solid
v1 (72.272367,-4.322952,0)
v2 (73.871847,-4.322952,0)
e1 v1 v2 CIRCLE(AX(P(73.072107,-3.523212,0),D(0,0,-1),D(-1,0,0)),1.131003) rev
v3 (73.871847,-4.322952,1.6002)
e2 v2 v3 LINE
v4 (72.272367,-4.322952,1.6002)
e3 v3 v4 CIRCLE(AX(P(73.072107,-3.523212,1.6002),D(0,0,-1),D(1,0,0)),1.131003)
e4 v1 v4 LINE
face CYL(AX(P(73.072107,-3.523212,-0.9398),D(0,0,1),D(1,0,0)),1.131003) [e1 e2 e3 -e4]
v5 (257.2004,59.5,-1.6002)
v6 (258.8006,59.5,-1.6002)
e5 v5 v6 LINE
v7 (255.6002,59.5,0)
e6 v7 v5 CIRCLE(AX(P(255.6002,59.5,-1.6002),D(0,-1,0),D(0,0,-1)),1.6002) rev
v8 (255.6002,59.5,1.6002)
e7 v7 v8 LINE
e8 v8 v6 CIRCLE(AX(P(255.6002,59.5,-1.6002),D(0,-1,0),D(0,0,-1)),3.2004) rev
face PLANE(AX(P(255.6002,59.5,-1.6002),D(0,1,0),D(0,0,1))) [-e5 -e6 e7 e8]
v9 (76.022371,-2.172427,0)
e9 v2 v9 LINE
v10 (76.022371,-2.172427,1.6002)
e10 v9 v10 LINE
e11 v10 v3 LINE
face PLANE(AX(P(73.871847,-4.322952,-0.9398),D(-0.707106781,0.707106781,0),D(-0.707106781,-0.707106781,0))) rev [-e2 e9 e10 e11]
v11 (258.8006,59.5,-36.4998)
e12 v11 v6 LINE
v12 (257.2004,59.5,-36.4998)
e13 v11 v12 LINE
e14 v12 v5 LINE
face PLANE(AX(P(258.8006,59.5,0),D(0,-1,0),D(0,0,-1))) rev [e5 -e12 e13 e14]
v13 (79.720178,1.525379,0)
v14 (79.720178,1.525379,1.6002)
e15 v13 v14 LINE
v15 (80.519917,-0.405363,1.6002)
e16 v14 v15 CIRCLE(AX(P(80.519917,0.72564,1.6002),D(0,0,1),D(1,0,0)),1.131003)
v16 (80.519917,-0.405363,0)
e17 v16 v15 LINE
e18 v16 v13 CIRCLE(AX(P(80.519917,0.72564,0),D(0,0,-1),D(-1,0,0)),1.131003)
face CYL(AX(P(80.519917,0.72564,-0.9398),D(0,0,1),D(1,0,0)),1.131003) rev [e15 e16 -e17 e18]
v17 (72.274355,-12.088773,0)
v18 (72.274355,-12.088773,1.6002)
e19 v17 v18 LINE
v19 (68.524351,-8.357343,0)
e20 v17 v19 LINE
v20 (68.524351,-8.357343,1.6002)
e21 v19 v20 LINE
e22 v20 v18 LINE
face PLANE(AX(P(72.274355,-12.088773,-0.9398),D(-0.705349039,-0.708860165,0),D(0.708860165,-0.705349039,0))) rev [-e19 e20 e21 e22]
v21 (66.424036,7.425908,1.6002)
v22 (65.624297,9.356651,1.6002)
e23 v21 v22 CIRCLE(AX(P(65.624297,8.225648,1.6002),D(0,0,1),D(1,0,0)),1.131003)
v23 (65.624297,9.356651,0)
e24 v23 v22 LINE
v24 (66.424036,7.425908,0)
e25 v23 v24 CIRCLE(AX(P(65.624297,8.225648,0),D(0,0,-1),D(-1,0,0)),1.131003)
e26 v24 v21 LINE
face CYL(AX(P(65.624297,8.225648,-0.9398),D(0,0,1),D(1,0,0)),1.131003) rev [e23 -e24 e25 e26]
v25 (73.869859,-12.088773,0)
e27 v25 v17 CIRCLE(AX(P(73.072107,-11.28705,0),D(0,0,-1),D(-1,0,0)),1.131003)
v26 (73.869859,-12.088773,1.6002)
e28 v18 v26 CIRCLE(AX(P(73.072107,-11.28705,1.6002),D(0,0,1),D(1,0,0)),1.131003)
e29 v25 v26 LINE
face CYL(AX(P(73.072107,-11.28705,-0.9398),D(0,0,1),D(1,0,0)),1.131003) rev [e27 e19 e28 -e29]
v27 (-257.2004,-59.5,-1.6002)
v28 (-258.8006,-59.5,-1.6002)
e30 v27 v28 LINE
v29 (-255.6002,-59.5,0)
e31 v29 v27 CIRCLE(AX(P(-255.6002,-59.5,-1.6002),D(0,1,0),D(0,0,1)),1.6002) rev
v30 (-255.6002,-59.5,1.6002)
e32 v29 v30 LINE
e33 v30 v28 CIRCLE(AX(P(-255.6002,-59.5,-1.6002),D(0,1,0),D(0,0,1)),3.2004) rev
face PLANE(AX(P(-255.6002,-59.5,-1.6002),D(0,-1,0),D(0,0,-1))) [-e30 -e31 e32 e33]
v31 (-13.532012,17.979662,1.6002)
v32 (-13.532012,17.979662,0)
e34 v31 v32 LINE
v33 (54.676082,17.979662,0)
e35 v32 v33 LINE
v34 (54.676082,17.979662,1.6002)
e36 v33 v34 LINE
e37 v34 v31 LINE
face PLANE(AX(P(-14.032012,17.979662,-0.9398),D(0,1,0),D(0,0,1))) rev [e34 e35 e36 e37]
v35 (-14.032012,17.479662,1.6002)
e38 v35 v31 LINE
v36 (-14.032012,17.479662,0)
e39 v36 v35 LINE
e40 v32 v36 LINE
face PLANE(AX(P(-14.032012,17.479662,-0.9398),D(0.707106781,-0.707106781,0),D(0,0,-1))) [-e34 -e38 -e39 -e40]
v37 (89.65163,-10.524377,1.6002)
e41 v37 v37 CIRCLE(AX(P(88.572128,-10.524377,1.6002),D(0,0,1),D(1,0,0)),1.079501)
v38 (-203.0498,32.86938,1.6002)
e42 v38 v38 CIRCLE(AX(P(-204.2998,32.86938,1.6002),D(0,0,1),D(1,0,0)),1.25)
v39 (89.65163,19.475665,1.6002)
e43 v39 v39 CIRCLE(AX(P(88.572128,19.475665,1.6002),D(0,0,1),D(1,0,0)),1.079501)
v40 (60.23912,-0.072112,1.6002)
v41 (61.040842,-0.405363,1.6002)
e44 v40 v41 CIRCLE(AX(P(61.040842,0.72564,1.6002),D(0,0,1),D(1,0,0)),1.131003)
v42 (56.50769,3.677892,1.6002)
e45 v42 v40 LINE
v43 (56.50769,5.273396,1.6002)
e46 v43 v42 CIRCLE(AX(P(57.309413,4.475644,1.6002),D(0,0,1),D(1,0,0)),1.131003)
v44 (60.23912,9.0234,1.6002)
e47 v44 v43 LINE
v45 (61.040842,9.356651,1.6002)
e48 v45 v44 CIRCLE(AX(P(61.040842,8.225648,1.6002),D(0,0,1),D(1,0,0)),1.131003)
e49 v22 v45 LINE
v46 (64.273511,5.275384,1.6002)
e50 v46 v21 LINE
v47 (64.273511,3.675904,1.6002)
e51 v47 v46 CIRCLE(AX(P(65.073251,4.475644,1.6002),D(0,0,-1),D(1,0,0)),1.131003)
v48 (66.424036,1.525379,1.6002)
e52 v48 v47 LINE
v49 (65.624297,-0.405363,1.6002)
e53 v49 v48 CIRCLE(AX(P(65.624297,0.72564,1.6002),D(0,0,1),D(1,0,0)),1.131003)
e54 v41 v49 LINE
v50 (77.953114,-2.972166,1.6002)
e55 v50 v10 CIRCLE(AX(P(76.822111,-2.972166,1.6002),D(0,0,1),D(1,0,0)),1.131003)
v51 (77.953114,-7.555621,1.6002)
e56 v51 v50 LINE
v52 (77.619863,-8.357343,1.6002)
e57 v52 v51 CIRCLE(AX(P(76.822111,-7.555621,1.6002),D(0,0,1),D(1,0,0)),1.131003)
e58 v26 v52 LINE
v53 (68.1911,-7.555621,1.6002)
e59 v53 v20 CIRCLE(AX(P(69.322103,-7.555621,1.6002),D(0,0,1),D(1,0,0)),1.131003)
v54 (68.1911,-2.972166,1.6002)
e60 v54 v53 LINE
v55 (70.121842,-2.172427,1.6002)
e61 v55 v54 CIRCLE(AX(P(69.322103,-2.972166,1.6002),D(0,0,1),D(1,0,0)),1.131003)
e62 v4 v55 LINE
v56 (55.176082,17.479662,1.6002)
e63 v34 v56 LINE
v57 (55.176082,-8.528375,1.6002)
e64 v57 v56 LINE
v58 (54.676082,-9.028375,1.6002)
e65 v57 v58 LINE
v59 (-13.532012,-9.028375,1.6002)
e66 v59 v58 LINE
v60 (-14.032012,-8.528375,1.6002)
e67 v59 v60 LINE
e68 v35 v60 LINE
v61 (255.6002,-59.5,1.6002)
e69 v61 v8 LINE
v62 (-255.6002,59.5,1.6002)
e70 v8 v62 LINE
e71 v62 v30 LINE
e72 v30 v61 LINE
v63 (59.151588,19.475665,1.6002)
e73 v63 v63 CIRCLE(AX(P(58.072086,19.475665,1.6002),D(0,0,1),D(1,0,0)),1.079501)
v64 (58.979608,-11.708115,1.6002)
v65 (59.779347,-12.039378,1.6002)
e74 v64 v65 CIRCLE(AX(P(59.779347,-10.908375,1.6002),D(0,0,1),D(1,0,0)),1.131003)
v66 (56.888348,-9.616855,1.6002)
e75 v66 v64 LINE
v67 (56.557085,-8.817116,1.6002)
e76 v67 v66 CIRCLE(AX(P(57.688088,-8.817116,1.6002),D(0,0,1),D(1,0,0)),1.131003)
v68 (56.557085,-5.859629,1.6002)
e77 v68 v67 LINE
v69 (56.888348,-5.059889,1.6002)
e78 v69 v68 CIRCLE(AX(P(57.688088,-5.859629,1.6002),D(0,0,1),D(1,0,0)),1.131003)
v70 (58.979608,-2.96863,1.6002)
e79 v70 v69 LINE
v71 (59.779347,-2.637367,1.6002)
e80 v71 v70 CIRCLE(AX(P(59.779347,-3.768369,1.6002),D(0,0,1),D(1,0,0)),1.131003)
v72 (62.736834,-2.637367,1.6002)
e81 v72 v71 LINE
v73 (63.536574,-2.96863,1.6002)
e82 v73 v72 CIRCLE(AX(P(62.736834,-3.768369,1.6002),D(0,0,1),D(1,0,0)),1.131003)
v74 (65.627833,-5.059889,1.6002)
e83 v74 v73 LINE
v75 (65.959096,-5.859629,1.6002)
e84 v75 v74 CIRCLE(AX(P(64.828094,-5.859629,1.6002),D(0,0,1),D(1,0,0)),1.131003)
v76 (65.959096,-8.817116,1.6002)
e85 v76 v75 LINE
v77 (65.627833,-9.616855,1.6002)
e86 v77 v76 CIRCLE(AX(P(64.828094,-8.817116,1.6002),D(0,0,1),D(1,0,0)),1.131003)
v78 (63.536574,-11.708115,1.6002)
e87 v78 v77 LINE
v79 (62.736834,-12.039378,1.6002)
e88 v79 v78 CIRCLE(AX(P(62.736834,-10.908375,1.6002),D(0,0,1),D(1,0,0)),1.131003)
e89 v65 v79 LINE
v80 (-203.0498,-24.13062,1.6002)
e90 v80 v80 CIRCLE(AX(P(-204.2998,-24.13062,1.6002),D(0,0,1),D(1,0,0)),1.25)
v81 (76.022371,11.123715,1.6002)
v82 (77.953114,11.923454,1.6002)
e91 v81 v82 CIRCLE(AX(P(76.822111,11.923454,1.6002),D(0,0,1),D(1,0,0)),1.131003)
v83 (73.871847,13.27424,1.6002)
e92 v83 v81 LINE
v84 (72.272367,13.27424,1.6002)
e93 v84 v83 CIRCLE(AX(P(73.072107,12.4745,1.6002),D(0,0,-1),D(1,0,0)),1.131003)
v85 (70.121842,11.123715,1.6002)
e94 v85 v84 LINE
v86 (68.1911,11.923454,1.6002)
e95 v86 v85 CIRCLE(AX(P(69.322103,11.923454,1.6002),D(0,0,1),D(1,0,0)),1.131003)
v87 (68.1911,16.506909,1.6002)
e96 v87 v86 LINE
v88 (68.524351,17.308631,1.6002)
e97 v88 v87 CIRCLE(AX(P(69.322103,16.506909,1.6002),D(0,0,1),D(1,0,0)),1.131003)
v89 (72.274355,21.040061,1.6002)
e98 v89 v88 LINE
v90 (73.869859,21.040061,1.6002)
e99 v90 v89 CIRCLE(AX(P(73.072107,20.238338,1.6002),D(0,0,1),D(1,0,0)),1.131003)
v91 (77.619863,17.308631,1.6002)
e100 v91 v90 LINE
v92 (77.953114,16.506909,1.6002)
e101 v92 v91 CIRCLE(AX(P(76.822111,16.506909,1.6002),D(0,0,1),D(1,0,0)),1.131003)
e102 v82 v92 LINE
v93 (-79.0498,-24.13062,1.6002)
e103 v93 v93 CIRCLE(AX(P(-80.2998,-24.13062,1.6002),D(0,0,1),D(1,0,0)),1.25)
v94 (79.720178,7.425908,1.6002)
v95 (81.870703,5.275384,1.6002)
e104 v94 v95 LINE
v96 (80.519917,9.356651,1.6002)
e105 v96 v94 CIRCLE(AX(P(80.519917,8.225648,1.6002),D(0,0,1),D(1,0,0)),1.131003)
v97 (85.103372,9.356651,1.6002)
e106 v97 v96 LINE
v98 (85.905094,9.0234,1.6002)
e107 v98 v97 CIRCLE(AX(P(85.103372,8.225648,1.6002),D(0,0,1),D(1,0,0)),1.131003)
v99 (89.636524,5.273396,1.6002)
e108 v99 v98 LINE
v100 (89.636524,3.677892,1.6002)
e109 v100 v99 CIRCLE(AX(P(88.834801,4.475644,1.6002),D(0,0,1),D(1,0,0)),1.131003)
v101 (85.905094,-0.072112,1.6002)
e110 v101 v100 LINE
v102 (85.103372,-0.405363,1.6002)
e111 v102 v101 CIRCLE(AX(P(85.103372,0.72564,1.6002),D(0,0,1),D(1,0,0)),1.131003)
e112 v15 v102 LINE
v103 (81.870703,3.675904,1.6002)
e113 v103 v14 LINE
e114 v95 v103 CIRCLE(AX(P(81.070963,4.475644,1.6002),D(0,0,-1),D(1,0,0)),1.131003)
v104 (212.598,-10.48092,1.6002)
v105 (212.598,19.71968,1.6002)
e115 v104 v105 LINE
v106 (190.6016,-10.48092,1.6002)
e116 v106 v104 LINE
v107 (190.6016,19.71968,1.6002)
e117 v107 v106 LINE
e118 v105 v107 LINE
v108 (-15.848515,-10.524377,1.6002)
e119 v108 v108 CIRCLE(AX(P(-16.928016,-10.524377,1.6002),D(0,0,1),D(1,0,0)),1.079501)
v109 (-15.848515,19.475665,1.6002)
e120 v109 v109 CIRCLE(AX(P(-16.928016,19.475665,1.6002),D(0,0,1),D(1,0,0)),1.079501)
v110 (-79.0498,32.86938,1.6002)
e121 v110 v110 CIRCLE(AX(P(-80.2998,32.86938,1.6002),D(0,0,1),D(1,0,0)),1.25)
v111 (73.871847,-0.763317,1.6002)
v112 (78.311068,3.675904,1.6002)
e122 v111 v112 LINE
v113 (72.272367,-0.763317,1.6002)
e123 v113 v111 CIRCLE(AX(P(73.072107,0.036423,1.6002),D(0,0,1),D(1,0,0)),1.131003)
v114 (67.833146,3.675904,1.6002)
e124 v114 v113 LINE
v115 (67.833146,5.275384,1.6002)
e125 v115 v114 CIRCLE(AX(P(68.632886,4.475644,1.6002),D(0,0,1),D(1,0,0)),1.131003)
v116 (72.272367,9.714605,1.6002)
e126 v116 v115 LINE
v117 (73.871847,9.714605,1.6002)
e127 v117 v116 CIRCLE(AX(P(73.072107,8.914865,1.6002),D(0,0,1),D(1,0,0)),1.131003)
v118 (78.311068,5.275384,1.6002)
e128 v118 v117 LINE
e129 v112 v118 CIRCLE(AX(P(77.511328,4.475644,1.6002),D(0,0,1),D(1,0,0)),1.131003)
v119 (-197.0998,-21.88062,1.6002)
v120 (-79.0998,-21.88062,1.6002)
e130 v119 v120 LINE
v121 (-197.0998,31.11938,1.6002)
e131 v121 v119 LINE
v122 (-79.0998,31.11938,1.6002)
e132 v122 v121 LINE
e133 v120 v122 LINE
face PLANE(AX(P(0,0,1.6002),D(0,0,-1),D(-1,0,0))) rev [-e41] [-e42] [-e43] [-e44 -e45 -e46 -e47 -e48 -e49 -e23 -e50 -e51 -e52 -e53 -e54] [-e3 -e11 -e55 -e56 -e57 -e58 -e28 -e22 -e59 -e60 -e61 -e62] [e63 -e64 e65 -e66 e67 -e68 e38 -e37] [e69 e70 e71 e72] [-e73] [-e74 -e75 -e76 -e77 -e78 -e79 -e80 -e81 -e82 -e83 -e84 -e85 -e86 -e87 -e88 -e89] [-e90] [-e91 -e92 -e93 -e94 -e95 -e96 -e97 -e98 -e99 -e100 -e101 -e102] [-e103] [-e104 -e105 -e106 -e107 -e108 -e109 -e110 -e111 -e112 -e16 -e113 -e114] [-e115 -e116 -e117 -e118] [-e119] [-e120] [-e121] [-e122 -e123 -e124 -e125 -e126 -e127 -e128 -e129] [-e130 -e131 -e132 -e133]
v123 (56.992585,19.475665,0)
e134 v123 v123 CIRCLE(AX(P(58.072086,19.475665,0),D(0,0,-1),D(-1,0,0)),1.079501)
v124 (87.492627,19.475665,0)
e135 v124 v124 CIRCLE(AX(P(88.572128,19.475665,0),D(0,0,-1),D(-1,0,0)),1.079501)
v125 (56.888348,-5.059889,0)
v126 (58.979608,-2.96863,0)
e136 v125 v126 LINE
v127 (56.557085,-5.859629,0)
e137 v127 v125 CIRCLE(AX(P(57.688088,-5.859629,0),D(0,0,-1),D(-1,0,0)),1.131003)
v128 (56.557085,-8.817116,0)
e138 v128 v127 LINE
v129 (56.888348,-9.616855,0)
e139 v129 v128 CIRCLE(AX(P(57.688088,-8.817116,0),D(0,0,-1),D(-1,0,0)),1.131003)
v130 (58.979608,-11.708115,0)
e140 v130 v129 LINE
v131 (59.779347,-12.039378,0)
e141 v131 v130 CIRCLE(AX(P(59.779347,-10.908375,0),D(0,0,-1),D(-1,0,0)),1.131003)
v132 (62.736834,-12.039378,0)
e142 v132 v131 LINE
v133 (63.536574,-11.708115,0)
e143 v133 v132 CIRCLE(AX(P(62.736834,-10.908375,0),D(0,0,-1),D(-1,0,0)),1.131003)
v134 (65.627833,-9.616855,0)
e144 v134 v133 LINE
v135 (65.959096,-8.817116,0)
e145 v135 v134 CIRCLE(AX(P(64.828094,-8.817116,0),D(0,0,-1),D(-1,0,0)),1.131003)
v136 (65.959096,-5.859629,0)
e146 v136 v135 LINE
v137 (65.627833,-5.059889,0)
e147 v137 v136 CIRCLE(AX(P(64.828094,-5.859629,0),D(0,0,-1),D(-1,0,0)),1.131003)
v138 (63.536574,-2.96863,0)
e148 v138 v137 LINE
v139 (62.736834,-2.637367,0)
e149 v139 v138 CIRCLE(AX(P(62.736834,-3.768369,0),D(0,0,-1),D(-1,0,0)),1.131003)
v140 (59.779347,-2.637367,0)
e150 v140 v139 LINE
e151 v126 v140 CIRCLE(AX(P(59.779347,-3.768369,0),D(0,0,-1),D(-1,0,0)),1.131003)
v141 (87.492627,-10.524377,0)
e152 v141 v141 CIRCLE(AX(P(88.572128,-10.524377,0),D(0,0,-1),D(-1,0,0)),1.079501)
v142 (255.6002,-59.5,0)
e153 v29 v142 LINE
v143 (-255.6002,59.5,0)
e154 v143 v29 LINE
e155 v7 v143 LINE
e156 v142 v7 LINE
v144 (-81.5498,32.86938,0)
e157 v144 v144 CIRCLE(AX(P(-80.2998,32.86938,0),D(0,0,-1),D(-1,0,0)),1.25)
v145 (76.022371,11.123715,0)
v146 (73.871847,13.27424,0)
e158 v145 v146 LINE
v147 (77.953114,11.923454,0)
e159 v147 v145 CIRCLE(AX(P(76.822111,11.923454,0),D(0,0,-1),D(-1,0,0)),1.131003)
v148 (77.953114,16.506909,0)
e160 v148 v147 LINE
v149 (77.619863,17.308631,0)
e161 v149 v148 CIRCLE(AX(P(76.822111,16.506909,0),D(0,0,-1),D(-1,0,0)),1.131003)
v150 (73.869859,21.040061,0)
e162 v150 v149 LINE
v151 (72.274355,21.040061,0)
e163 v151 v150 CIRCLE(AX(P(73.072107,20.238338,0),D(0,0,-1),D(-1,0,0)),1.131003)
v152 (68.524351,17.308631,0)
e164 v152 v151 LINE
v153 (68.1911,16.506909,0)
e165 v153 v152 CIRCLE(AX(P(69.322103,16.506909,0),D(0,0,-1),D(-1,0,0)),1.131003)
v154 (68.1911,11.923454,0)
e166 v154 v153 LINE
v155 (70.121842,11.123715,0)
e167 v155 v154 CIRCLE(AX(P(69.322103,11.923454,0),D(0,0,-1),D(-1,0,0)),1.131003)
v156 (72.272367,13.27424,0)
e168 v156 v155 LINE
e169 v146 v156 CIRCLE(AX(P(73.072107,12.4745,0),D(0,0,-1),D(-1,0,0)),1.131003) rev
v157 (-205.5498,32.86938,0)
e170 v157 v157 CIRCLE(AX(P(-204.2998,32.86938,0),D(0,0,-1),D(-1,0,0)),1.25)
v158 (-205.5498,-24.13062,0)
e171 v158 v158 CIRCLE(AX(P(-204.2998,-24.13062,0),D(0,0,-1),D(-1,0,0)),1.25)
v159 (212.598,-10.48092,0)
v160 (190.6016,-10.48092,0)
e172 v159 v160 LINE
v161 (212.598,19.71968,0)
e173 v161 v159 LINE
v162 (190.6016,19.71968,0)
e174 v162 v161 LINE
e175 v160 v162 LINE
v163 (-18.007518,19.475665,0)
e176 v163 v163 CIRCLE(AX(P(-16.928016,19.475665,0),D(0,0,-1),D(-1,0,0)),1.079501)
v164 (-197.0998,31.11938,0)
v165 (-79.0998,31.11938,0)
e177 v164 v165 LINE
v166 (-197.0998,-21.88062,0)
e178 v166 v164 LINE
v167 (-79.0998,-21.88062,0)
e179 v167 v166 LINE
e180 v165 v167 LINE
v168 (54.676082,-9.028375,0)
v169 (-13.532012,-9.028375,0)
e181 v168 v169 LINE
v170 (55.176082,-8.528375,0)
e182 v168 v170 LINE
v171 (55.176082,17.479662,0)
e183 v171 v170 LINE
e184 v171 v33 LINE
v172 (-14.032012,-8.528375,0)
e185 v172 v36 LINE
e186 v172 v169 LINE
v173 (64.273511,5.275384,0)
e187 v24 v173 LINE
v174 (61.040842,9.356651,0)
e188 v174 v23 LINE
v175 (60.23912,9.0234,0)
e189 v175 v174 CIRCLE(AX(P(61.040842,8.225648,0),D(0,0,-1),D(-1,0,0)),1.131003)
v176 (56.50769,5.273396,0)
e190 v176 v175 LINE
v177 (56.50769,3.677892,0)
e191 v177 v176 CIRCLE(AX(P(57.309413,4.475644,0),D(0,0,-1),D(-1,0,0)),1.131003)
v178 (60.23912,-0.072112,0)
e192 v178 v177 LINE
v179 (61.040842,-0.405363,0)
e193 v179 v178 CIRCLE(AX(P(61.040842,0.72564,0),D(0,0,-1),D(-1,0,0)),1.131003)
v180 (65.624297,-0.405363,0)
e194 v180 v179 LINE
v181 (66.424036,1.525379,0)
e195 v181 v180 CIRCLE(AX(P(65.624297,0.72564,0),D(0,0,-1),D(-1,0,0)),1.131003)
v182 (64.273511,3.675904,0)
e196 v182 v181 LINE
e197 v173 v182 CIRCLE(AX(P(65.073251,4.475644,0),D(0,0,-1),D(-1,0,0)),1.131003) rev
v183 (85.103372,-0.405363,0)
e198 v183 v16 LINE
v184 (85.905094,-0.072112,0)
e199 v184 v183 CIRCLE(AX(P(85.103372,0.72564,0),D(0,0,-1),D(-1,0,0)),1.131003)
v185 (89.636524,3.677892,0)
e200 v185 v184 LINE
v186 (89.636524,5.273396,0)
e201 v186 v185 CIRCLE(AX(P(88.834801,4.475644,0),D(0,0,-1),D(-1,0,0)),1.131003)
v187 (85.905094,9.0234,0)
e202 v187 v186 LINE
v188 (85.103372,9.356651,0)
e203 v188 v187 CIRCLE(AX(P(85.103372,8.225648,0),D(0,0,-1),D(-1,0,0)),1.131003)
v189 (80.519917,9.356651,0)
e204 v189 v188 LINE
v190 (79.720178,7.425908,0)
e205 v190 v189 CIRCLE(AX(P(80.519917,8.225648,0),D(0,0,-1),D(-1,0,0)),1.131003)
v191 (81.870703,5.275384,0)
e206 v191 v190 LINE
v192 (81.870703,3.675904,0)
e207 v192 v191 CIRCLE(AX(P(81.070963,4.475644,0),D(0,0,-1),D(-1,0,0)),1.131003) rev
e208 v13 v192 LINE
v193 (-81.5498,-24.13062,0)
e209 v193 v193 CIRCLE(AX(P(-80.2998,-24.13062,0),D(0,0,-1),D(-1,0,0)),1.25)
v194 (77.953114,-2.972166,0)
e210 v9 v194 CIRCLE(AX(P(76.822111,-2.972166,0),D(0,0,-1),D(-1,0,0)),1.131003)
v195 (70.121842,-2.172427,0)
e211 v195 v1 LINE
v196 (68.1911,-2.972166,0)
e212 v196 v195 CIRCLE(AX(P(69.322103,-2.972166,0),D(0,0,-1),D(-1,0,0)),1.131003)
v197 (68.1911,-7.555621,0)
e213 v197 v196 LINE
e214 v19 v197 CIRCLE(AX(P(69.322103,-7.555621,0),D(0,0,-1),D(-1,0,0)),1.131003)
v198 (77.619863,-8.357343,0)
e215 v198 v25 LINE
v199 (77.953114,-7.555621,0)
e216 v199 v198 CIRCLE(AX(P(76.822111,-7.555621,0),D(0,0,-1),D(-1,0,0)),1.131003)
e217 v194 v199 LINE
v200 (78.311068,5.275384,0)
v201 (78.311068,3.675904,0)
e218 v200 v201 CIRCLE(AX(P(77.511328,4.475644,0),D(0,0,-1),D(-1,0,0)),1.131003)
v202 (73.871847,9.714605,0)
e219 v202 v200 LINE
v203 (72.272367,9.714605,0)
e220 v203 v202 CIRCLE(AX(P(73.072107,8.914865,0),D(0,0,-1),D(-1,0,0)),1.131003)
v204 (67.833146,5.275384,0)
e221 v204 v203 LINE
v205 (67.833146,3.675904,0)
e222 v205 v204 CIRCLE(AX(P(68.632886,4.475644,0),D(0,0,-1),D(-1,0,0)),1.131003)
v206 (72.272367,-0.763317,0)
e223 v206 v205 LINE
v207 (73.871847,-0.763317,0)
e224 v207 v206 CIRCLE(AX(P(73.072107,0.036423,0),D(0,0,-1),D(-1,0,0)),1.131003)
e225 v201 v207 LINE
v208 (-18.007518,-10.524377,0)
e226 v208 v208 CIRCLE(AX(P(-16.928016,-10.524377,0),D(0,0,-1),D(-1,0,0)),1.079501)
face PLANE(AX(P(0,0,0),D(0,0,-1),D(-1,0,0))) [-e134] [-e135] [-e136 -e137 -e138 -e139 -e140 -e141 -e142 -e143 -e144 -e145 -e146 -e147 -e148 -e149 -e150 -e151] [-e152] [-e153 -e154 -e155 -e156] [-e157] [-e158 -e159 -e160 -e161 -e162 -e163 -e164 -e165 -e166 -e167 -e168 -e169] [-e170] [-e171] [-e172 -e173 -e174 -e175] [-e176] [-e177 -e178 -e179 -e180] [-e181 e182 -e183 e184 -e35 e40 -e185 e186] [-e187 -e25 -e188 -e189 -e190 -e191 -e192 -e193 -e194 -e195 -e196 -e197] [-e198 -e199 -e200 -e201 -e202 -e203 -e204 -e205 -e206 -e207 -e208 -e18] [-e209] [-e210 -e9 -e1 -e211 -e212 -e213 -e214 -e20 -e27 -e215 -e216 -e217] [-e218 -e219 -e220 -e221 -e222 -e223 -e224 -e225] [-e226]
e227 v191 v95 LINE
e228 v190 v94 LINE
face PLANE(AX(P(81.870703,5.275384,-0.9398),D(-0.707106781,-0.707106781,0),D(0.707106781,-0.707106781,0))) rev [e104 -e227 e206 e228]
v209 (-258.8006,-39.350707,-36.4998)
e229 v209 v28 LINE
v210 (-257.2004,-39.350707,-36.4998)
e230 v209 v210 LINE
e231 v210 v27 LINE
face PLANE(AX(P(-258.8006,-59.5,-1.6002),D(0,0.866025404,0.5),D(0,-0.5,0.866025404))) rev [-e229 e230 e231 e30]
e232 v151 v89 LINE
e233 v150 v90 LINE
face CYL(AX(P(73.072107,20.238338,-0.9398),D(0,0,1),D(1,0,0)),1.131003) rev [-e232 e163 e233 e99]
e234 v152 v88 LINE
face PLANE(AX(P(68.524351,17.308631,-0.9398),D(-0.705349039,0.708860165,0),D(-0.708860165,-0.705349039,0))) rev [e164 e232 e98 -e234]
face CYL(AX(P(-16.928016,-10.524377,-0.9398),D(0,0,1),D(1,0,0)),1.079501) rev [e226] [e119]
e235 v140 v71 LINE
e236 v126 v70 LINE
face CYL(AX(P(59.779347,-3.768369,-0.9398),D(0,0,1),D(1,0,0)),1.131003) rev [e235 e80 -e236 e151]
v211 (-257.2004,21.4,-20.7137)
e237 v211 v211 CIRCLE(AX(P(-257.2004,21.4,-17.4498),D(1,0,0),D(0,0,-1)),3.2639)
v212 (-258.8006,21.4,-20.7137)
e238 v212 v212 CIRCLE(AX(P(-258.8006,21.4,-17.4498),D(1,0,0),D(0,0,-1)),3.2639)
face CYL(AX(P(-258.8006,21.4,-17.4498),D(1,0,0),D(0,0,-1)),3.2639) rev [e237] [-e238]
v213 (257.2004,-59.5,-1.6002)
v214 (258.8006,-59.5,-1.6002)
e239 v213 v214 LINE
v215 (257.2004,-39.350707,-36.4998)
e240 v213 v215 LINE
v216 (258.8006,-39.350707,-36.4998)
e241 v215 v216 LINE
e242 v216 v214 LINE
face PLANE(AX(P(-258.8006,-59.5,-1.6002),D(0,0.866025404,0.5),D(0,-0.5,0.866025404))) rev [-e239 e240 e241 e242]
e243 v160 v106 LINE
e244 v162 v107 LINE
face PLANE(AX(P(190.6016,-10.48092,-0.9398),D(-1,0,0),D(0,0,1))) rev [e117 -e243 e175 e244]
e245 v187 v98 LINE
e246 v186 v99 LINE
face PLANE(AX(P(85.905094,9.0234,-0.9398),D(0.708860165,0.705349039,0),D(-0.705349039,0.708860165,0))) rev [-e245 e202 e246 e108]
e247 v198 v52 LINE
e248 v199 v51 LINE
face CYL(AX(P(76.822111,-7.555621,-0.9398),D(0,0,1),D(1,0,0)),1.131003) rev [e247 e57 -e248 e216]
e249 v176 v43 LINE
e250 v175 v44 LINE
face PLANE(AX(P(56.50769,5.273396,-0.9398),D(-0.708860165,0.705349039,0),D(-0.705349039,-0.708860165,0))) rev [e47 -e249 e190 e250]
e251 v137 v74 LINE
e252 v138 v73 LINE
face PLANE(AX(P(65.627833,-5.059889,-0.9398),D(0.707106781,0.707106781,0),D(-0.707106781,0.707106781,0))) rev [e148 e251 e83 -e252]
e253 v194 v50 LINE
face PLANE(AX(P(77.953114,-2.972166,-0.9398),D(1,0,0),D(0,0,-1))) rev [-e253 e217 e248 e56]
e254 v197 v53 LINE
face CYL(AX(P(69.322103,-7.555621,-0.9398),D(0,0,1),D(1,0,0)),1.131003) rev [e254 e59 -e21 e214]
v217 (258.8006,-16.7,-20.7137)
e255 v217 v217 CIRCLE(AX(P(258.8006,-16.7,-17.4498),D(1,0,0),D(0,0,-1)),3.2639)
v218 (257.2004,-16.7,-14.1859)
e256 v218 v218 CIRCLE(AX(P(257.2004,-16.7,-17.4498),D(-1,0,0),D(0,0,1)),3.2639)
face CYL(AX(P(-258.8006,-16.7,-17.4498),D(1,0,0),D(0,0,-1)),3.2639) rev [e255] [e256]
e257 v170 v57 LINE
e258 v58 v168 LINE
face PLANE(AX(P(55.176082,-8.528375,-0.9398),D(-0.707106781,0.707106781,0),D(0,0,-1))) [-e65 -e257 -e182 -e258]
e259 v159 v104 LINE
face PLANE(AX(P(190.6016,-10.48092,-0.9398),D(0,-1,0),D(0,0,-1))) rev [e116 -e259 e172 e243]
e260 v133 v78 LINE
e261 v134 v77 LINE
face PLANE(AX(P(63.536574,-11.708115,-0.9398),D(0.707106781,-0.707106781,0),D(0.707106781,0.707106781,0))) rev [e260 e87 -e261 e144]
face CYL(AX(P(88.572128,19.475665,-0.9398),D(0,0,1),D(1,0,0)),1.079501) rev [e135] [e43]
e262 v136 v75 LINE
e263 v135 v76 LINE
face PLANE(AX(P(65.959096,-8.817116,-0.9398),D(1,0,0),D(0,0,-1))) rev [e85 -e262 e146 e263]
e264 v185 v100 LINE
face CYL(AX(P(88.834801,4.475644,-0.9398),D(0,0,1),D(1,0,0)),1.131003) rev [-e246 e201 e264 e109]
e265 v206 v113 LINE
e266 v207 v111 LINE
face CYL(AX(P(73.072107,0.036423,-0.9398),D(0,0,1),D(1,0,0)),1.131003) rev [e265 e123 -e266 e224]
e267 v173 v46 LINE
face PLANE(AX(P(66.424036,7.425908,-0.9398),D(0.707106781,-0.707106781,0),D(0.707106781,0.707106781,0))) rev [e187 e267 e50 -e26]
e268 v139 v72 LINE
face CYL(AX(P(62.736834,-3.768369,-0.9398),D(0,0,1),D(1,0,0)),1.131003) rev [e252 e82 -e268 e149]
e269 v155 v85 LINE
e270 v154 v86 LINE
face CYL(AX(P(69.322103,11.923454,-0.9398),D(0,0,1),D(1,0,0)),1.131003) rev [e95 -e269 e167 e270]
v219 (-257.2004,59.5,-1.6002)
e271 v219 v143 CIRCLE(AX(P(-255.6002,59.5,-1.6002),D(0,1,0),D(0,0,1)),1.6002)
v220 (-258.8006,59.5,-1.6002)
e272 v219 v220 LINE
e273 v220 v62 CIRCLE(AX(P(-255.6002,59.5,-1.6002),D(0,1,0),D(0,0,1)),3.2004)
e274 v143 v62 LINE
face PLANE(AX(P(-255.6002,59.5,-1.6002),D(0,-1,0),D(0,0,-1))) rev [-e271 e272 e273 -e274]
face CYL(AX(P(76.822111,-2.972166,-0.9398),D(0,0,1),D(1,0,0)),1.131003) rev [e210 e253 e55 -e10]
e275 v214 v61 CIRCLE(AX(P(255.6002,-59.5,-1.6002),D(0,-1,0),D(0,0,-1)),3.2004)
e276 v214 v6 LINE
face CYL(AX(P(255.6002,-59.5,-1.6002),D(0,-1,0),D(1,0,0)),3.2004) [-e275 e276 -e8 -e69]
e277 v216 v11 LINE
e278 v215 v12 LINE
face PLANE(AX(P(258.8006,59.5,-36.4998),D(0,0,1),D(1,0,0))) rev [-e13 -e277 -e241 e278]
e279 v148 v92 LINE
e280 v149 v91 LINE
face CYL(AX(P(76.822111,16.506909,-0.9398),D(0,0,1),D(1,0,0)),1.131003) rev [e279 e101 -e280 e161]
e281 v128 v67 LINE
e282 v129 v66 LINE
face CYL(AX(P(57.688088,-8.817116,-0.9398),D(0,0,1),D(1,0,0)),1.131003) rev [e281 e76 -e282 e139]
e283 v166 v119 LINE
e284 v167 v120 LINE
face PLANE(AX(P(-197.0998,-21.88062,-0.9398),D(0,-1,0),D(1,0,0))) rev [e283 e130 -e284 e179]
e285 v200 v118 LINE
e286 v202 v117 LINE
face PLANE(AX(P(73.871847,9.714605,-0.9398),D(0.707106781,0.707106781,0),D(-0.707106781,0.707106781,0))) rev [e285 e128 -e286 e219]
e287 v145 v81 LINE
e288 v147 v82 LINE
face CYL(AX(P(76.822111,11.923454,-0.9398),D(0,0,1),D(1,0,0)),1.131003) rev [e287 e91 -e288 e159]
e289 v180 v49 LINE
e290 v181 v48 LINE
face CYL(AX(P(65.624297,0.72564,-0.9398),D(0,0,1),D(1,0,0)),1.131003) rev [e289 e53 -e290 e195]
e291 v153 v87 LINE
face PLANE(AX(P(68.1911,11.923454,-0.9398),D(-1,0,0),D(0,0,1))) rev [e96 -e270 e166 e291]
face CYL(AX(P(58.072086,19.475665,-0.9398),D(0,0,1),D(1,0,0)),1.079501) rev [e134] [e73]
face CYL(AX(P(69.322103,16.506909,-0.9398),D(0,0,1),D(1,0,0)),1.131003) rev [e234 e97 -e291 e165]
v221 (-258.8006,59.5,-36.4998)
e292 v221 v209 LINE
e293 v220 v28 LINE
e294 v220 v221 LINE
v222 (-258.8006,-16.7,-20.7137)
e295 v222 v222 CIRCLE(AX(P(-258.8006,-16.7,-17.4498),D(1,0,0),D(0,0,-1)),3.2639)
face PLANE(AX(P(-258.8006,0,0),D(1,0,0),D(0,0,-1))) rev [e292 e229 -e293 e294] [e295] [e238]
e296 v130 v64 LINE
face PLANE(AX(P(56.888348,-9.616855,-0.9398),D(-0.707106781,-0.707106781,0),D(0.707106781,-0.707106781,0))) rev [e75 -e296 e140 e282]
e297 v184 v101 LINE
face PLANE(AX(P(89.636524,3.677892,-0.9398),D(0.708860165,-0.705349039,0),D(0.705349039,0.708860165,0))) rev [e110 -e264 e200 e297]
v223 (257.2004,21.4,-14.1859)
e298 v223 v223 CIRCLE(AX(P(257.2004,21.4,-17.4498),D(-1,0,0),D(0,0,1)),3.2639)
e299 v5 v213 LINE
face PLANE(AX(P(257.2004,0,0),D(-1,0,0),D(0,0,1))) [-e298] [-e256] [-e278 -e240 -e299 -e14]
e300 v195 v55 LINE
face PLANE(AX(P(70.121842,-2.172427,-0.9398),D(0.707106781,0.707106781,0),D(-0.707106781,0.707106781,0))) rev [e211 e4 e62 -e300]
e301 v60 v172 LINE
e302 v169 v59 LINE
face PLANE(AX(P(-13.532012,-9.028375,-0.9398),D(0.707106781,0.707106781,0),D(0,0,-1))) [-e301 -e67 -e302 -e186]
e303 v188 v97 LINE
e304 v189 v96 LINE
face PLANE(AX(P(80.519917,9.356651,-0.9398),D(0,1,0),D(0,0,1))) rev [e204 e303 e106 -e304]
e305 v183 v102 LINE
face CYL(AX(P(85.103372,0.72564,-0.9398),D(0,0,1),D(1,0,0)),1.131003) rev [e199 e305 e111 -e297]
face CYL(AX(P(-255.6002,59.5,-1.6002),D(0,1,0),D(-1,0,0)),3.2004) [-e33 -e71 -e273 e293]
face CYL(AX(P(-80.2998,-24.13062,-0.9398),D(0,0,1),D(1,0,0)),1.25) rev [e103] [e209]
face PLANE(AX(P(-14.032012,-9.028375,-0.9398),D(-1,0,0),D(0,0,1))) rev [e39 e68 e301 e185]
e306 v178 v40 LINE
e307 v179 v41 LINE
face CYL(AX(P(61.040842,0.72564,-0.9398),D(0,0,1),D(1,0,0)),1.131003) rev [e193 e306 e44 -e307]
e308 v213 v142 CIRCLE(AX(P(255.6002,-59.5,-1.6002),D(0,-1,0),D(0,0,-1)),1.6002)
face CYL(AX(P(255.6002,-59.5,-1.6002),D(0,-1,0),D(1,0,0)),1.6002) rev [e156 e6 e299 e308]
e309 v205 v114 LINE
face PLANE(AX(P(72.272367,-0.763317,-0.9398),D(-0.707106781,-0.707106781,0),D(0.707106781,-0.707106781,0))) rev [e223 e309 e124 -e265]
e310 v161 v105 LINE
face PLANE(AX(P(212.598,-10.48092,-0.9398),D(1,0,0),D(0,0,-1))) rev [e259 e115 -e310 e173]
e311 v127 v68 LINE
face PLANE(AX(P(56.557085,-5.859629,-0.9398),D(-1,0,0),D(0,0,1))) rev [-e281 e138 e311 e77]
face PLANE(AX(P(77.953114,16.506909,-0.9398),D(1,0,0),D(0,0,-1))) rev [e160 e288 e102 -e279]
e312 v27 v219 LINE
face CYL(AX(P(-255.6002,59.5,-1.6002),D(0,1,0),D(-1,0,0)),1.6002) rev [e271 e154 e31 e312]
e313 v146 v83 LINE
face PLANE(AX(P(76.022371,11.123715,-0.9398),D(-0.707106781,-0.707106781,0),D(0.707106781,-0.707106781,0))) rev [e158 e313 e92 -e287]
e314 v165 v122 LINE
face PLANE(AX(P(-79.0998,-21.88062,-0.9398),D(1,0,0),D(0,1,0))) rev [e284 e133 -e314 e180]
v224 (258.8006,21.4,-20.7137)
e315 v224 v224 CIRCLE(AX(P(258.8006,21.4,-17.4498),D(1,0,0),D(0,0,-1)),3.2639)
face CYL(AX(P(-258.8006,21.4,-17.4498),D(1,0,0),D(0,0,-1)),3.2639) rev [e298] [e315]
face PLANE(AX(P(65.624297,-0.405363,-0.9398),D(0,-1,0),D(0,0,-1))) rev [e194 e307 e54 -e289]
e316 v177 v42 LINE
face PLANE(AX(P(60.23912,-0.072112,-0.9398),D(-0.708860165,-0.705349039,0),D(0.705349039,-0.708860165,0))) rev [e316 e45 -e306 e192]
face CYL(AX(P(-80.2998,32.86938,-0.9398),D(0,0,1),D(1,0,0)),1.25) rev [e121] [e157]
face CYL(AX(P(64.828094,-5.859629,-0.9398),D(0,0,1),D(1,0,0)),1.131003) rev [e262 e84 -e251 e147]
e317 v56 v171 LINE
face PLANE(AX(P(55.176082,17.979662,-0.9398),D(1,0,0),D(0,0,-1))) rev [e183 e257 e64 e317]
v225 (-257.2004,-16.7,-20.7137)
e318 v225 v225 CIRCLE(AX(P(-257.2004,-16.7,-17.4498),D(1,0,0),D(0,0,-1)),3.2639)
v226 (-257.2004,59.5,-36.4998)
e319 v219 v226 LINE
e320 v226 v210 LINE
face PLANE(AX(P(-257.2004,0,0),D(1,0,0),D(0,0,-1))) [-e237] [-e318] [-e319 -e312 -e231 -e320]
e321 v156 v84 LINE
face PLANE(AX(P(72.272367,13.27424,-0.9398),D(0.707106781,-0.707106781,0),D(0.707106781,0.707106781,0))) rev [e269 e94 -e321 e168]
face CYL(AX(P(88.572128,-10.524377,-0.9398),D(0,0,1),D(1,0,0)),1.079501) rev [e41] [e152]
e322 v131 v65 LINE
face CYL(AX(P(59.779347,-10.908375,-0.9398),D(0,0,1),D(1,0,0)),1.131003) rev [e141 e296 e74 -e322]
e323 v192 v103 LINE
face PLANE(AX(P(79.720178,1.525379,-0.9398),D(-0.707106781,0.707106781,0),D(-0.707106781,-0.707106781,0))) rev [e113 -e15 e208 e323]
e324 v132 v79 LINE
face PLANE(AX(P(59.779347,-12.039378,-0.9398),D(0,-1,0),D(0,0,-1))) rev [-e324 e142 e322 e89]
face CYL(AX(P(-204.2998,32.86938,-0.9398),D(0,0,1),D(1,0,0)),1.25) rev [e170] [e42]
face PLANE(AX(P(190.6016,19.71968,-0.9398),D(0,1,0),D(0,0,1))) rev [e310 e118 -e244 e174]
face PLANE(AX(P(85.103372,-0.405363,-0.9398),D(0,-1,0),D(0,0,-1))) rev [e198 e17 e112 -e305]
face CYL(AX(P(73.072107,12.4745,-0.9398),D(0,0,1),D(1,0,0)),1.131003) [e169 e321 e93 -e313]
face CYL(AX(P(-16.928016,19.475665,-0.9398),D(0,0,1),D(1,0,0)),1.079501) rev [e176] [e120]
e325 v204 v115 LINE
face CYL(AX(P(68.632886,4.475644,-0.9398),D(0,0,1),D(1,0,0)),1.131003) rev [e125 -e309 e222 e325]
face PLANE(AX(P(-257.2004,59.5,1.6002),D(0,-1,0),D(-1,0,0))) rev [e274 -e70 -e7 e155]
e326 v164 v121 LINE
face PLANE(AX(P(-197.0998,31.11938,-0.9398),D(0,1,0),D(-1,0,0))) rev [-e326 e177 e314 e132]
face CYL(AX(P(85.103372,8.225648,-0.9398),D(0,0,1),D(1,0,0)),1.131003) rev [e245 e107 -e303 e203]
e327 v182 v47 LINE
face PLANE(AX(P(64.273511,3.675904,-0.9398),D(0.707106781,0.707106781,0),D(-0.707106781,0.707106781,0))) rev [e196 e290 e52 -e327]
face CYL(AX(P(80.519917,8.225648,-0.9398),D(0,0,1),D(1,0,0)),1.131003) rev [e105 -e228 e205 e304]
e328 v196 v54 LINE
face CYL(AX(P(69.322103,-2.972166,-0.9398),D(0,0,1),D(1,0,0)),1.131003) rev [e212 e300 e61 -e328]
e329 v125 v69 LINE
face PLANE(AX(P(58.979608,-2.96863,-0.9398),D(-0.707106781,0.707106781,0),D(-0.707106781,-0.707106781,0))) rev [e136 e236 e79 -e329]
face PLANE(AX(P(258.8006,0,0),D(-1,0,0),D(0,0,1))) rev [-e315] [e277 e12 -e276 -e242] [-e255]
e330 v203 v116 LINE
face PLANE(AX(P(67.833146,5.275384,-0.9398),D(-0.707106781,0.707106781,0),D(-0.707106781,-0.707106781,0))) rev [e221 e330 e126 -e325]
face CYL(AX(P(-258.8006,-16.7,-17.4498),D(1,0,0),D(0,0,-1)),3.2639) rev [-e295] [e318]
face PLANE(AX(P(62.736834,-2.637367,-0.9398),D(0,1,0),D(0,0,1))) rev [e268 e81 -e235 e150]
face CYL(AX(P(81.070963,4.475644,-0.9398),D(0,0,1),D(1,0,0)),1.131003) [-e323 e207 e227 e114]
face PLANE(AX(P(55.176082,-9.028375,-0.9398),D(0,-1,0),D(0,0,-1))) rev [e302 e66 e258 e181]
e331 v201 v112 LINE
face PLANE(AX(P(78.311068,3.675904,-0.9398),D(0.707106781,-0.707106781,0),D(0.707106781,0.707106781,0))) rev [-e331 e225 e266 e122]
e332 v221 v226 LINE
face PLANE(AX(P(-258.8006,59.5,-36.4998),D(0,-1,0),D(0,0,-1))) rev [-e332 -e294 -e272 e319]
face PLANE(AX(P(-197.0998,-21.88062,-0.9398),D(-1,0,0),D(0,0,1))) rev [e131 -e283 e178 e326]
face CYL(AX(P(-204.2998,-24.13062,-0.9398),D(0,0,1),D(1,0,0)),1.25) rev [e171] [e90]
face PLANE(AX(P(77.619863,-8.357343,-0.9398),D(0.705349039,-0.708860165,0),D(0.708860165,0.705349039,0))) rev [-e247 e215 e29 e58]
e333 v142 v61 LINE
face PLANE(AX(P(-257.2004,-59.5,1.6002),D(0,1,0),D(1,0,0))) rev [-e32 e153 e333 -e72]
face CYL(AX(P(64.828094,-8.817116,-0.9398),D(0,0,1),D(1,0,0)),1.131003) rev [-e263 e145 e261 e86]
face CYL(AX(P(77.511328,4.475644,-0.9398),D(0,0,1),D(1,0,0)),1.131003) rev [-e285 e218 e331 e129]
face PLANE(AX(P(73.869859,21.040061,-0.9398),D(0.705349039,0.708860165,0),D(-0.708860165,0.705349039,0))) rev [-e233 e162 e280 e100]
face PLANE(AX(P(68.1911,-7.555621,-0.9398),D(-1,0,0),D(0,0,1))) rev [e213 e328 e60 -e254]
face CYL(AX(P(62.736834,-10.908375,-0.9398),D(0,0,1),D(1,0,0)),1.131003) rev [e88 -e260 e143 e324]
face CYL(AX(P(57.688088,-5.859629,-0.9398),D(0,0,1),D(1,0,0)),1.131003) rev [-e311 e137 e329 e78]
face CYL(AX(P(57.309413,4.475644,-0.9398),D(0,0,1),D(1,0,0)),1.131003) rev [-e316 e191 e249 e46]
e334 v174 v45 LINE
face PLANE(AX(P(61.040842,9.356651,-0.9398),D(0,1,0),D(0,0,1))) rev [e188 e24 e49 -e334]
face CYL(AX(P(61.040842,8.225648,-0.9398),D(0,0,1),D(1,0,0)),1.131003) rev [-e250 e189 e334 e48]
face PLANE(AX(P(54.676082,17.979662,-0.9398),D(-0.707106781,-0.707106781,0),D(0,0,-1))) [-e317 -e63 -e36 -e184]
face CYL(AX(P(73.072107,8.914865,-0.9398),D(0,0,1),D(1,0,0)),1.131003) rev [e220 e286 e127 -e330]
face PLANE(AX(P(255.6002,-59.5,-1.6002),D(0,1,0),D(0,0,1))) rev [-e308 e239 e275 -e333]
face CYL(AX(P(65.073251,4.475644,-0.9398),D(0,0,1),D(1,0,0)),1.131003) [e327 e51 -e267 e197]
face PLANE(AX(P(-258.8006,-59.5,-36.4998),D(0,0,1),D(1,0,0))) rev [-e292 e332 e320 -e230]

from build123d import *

# Parameters (mm, degrees)
SKETCH1_W                      = 514.4008
SKETCH1_H                      = 119
BOSS_EXTRUDE1_DEPTH            = 1.6002
EDGE_FLANGE1_STRIP_W           = 9.6012
EDGE_FLANGE1_STRIP_H           = 1.6002
EDGE_FLANGE1_STRIP_CUT_DEPTH   = 119
EDGE_FLANGE1_STRIP_2_W         = 9.6012
EDGE_FLANGE1_STRIP_2_H         = 1.6002
EDGE_FLANGE1_STRIP_CUT_2_DEPTH = 119
EDGE_FLANGE1_DEPTH             = 119
EDGE_FLANGE1_BEND_DEPTH        = 119
SKETCH19_R                     = 3.2639
CUT_EXTRUDE1_DEPTH             = 523.286786777
SKETCH21_R                     = 1.25
SKETCH21_W                     = 117.999999966
SKETCH21_H                     = 53
CUT_EXTRUDE3_DEPTH             = 2.54
SKETCH22_W                     = 21.9964
SKETCH22_H                     = 30.2006
CUT_EXTRUDE4_DEPTH             = 2.54
SKETCH23_R                     = 1.079501479
SKETCH23_W                     = 69.208094806
SKETCH23_H                     = 27.008036997
CUT_EXTRUDE5_DEPTH             = 2.54
CHAMFER1_SIZE                  = 0.5
CUT_EXTRUDE6_DEPTH             = 523.286786777


# Sheet-metal steps are written as plain solids
with BuildPart() as part:
    # Sketch1 → Boss-Extrude1 (new body)
    with BuildSketch(Plane.XY):
        Rectangle(SKETCH1_W, SKETCH1_H)
    extrude(amount=BOSS_EXTRUDE1_DEPTH)

    # Edge-Flange1 strip (across the edge) → Edge-Flange1 strip cut (cut)
    with BuildSketch(Plane(origin=(257.2004, 59.5, 0), x_dir=(-1, 0, 0), z_dir=(0, -1, 0))):
        with Locations((-3.2004, -0.8001)):
            Rectangle(EDGE_FLANGE1_STRIP_W, EDGE_FLANGE1_STRIP_H)
    extrude(amount=EDGE_FLANGE1_STRIP_CUT_DEPTH, mode=Mode.SUBTRACT)

    # Edge-Flange1 strip 2 (across the edge) → Edge-Flange1 strip cut 2 (cut)
    with BuildSketch(Plane(origin=(-257.2004, -59.5, 0), x_dir=(1, 0, 0), z_dir=(0, 1, 0))):
        with Locations((-3.2004, -0.8001)):
            Rectangle(EDGE_FLANGE1_STRIP_2_W, EDGE_FLANGE1_STRIP_2_H)
    extrude(amount=EDGE_FLANGE1_STRIP_CUT_2_DEPTH, mode=Mode.SUBTRACT)

    # Edge-Flange1 section (across the edge) → Edge-Flange1 (add)
    with BuildSketch(Plane(origin=(257.2004, 59.5, 0), x_dir=(-1, 0, 0), z_dir=(0, -1, 0))):
        with BuildLine():
            Line((-1.6002, 1.6002), (-1.6002, 36.4998))
            Line((-1.6002, 36.4998), (0, 36.4998))
            Line((0, 36.4998), (0, 1.6002))
            ThreePointArc((0, 1.6002), (0.468687729, 0.468687729), (1.6002, 0))
            Line((1.6002, 0), (1.6002, -1.6002))
            ThreePointArc((1.6002, -1.6002), (-0.662824543, -0.662824543), (-1.6002, 1.6002))
        make_face()
    extrude(amount=EDGE_FLANGE1_DEPTH)

    # Edge-Flange1 section 2 (across the edge) → Edge-Flange1 bend (add)
    with BuildSketch(Plane(origin=(-257.2004, -59.5, 0), x_dir=(1, 0, 0), z_dir=(0, 1, 0))):
        with BuildLine():
            Line((-1.6002, 1.6002), (-1.6002, 36.4998))
            Line((-1.6002, 36.4998), (0, 36.4998))
            Line((0, 36.4998), (0, 1.6002))
            ThreePointArc((0, 1.6002), (0.468687729, 0.468687729), (1.6002, 0))
            Line((1.6002, 0), (1.6002, -1.6002))
            ThreePointArc((1.6002, -1.6002), (-0.662824543, -0.662824543), (-1.6002, 1.6002))
        make_face()
    extrude(amount=EDGE_FLANGE1_BEND_DEPTH)

    # Sketch19 → Cut-Extrude1 (cut, through all)
    with BuildSketch(Plane(origin=(258.8006, 0, 0), x_dir=(0, 0, -1), z_dir=(1, 0, 0))):
        with Locations((17.4498, 21.4)):
            Circle(SKETCH19_R)
        with Locations((17.4498, -16.7)):
            Circle(SKETCH19_R)
    extrude(amount=-CUT_EXTRUDE1_DEPTH, mode=Mode.SUBTRACT)

    # Sketch21 → Cut-Extrude3 (cut)
    with BuildSketch(Plane.XY.offset(1.6002)):
        with Locations((-204.299799983, 32.869379504)):
            Circle(SKETCH21_R)
        with Locations((-80.299799983, 32.869379504)):
            Circle(SKETCH21_R)
        with Locations((-204.299799983, -24.130620496)):
            Circle(SKETCH21_R)
        with Locations((-80.299799983, -24.130620496)):
            Circle(SKETCH21_R)
        with Locations((-138.0998, 4.619379504)):
            Rectangle(SKETCH21_W, SKETCH21_H)
    extrude(amount=-CUT_EXTRUDE3_DEPTH, mode=Mode.SUBTRACT)

    # Sketch22 → Cut-Extrude4 (cut)
    with BuildSketch(Plane.XY.offset(1.6002)):
        with Locations((201.5998, 4.619379504)):
            Rectangle(SKETCH22_W, SKETCH22_H)
    extrude(amount=-CUT_EXTRUDE4_DEPTH, mode=Mode.SUBTRACT)

    # Sketch23 → Cut-Extrude5 (cut)
    with BuildSketch(Plane.XY.offset(1.6002)):
        with Locations((-16.92801633, 19.475664516)):
            Circle(SKETCH23_R)
        with Locations((-16.92801633, -10.52437658)):
            Circle(SKETCH23_R)
        with Locations((58.07208641, 19.475664516)):
            Circle(SKETCH23_R)
        with Locations((88.572128191, 19.475664516)):
            Circle(SKETCH23_R)
        with Locations((88.572128191, -10.52437658)):
            Circle(SKETCH23_R)
        with Locations((20.57203504, 4.475643969)):
            Rectangle(SKETCH23_W, SKETCH23_H)
        with BuildLine():
            Line((81.870702539, 5.275383569), (79.720177643, 7.425908465))
            ThreePointArc((79.720177643, 7.425908465), (79.4750071, 8.658464018), (80.519917243, 9.356650655))
            Line((80.519917243, 9.356650655), (85.103371505, 9.356650655))
            ThreePointArc((85.103371505, 9.356650655), (85.537484246, 9.270020118), (85.905094187, 9.023399655))
            Line((85.905094187, 9.023399655), (89.636523764, 5.273395558))
            ThreePointArc((89.636523764, 5.273395558), (89.965803671, 4.475643968), (89.636523764, 3.677892379))
            Line((89.636523764, 3.677892379), (85.905094187, -0.072111718))
            ThreePointArc((85.905094187, -0.072111718), (85.537484246, -0.318732182), (85.103371505, -0.405362718))
            Line((85.103371505, -0.405362718), (80.519917243, -0.405362718))
            ThreePointArc((80.519917243, -0.405362718), (79.4750071, 0.292823919), (79.720177643, 1.525379472))
            Line((79.720177643, 1.525379472), (81.870702539, 3.675904368))
            ThreePointArc((81.870702539, 3.675904368), (82.201965528, 4.475643968), (81.870702539, 5.275383569))
        make_face()
        with BuildLine():
            Line((73.871846558, 9.714604607), (78.311067597, 5.275383569))
            ThreePointArc((78.311067597, 5.275383569), (78.642330586, 4.475643968), (78.311067597, 3.675904368))
            Line((78.311067597, 3.675904368), (73.871846558, -0.763316671))
            ThreePointArc((73.871846558, -0.763316671), (73.072106958, -1.094579659), (72.272367358, -0.763316671))
            Line((72.272367358, -0.763316671), (67.833146319, 3.675904368))
            ThreePointArc((67.833146319, 3.675904368), (67.50188333, 4.475643968), (67.833146319, 5.275383569))
            Line((67.833146319, 5.275383569), (72.272367358, 9.714604607))
            ThreePointArc((72.272367358, 9.714604607), (73.072106958, 10.045867596), (73.871846558, 9.714604607))
        make_face()
        with BuildLine():
            Line((72.272367358, 13.274239549), (70.121842461, 11.123714653))
            ThreePointArc((70.121842461, 11.123714653), (68.889286908, 10.87854411), (68.191100272, 11.923454253))
            Line((68.191100272, 11.923454253), (68.191100272, 16.506908516))
            ThreePointArc((68.191100272, 16.506908516), (68.277730808, 16.941021257), (68.524351272, 17.308631198))
            Line((68.524351272, 17.308631198), (72.274355369, 21.040060774))
            ThreePointArc((72.274355369, 21.040060774), (73.072106958, 21.369340682), (73.869858547, 21.040060774))
            Line((73.869858547, 21.040060774), (77.619862644, 17.308631198))
            ThreePointArc((77.619862644, 17.308631198), (77.866483108, 16.941021257), (77.953113644, 16.506908516))
            Line((77.953113644, 16.506908516), (77.953113644, 11.923454254))
            ThreePointArc((77.953113644, 11.923454254), (77.254927008, 10.87854411), (76.022371455, 11.123714653))
            Line((76.022371455, 11.123714653), (73.871846558, 13.274239549))
            ThreePointArc((73.871846558, 13.274239549), (73.072106958, 13.605502538), (72.272367358, 13.274239549))
        make_face()
        with BuildLine():
            Line((64.273511377, 3.675904368), (66.424036273, 1.525379472))
            ThreePointArc((66.424036273, 1.525379472), (66.669206816, 0.292823919), (65.624296673, -0.405362718))
            Line((65.624296673, -0.405362718), (61.040842411, -0.405362718))
            ThreePointArc((61.040842411, -0.405362718), (60.60672967, -0.318732182), (60.239119729, -0.072111718))
            Line((60.239119729, -0.072111718), (56.507690152, 3.677892379))
            ThreePointArc((56.507690152, 3.677892379), (56.178410245, 4.475643968), (56.507690152, 5.273395558))
            Line((56.507690152, 5.273395558), (60.239119729, 9.023399655))
            ThreePointArc((60.239119729, 9.023399655), (60.60672967, 9.270020118), (61.040842411, 9.356650655))
            Line((61.040842411, 9.356650655), (65.624296673, 9.356650655))
            ThreePointArc((65.624296673, 9.356650655), (66.669206816, 8.658464018), (66.424036273, 7.425908465))
            Line((66.424036273, 7.425908465), (64.273511377, 5.275383569))
            ThreePointArc((64.273511377, 5.275383569), (63.942248388, 4.475643968), (64.273511377, 3.675904368))
        make_face()
        with BuildLine():
            Line((73.871846558, -4.322951612), (76.022371455, -2.172426716))
            ThreePointArc((76.022371455, -2.172426716), (77.254927008, -1.927256173), (77.953113644, -2.972166317))
            Line((77.953113644, -2.972166317), (77.953113644, -7.555620579))
            ThreePointArc((77.953113644, -7.555620579), (77.866483108, -7.98973332), (77.619862644, -8.357343261))
            Line((77.619862644, -8.357343261), (73.869858547, -12.088772838))
            ThreePointArc((73.869858547, -12.088772838), (73.072106958, -12.418052745), (72.274355369, -12.088772838))
            Line((72.274355369, -12.088772838), (68.524351272, -8.357343261))
            ThreePointArc((68.524351272, -8.357343261), (68.277730808, -7.98973332), (68.191100272, -7.555620579))
            Line((68.191100272, -7.555620579), (68.191100272, -2.972166317))
            ThreePointArc((68.191100272, -2.972166317), (68.889286908, -1.927256173), (70.121842461, -2.172426716))
            Line((70.121842461, -2.172426716), (72.272367358, -4.322951612))
            ThreePointArc((72.272367358, -4.322951612), (73.072106958, -4.654214601), (73.871846558, -4.322951612))
        make_face()
        with BuildLine():
            Line((65.627833205, -5.059889025), (63.536573965, -2.968629784))
            ThreePointArc((63.536573965, -2.968629784), (63.169650317, -2.723459241), (62.736834364, -2.637366795))
            Line((62.736834364, -2.637366795), (59.779347184, -2.637366795))
            ThreePointArc((59.779347184, -2.637366795), (59.346531231, -2.723459241), (58.979607584, -2.968629784))
            Line((58.979607584, -2.968629784), (56.888348343, -5.059889025))
            ThreePointArc((56.888348343, -5.059889025), (56.6431778, -5.426812672), (56.557085355, -5.859628625))
            Line((56.557085355, -5.859628625), (56.557085355, -8.817115805))
            ThreePointArc((56.557085355, -8.817115805), (56.6431778, -9.249931758), (56.888348343, -9.616855406))
            Line((56.888348343, -9.616855406), (58.979607584, -11.708114646))
            ThreePointArc((58.979607584, -11.708114646), (59.346531231, -11.953285189), (59.779347184, -12.039377635))
            Line((59.779347184, -12.039377635), (62.736834364, -12.039377635))
            ThreePointArc((62.736834364, -12.039377635), (63.169650317, -11.953285189), (63.536573965, -11.708114646))
            Line((63.536573965, -11.708114646), (65.627833205, -9.616855406))
            ThreePointArc((65.627833205, -9.616855406), (65.873003748, -9.249931758), (65.959096194, -8.817115805))
            Line((65.959096194, -8.817115805), (65.959096194, -5.859628625))
            ThreePointArc((65.959096194, -5.859628625), (65.873003748, -5.426812672), (65.627833205, -5.059889025))
        make_face()
    extrude(amount=-CUT_EXTRUDE5_DEPTH, mode=Mode.SUBTRACT)

    # Chamfer1
    chamfer1_edges = [part.edges().sort_by_distance(p)[0] for p in [
        (-14.032012363, -9.02837453, 0.8001),
        (-14.032012363, 17.979662467, 0.8001),
        (55.176082443, 17.979662467, 0.8001),
        (55.176082443, -9.02837453, 0.8001),
    ]]
    chamfer(chamfer1_edges, length=CHAMFER1_SIZE)

    # Sketch24 → Cut-Extrude6 (cut, through all)
    with BuildSketch(Plane(origin=(258.8006, 0, 0), x_dir=(0, 0, -1), z_dir=(1, 0, 0))):
        Polygon((1.6002, -59.5), (36.4998, -39.350706545), (36.4998, -59.5), align=None)
    extrude(amount=-CUT_EXTRUDE6_DEPTH, mode=Mode.SUBTRACT)


solid = part.part
